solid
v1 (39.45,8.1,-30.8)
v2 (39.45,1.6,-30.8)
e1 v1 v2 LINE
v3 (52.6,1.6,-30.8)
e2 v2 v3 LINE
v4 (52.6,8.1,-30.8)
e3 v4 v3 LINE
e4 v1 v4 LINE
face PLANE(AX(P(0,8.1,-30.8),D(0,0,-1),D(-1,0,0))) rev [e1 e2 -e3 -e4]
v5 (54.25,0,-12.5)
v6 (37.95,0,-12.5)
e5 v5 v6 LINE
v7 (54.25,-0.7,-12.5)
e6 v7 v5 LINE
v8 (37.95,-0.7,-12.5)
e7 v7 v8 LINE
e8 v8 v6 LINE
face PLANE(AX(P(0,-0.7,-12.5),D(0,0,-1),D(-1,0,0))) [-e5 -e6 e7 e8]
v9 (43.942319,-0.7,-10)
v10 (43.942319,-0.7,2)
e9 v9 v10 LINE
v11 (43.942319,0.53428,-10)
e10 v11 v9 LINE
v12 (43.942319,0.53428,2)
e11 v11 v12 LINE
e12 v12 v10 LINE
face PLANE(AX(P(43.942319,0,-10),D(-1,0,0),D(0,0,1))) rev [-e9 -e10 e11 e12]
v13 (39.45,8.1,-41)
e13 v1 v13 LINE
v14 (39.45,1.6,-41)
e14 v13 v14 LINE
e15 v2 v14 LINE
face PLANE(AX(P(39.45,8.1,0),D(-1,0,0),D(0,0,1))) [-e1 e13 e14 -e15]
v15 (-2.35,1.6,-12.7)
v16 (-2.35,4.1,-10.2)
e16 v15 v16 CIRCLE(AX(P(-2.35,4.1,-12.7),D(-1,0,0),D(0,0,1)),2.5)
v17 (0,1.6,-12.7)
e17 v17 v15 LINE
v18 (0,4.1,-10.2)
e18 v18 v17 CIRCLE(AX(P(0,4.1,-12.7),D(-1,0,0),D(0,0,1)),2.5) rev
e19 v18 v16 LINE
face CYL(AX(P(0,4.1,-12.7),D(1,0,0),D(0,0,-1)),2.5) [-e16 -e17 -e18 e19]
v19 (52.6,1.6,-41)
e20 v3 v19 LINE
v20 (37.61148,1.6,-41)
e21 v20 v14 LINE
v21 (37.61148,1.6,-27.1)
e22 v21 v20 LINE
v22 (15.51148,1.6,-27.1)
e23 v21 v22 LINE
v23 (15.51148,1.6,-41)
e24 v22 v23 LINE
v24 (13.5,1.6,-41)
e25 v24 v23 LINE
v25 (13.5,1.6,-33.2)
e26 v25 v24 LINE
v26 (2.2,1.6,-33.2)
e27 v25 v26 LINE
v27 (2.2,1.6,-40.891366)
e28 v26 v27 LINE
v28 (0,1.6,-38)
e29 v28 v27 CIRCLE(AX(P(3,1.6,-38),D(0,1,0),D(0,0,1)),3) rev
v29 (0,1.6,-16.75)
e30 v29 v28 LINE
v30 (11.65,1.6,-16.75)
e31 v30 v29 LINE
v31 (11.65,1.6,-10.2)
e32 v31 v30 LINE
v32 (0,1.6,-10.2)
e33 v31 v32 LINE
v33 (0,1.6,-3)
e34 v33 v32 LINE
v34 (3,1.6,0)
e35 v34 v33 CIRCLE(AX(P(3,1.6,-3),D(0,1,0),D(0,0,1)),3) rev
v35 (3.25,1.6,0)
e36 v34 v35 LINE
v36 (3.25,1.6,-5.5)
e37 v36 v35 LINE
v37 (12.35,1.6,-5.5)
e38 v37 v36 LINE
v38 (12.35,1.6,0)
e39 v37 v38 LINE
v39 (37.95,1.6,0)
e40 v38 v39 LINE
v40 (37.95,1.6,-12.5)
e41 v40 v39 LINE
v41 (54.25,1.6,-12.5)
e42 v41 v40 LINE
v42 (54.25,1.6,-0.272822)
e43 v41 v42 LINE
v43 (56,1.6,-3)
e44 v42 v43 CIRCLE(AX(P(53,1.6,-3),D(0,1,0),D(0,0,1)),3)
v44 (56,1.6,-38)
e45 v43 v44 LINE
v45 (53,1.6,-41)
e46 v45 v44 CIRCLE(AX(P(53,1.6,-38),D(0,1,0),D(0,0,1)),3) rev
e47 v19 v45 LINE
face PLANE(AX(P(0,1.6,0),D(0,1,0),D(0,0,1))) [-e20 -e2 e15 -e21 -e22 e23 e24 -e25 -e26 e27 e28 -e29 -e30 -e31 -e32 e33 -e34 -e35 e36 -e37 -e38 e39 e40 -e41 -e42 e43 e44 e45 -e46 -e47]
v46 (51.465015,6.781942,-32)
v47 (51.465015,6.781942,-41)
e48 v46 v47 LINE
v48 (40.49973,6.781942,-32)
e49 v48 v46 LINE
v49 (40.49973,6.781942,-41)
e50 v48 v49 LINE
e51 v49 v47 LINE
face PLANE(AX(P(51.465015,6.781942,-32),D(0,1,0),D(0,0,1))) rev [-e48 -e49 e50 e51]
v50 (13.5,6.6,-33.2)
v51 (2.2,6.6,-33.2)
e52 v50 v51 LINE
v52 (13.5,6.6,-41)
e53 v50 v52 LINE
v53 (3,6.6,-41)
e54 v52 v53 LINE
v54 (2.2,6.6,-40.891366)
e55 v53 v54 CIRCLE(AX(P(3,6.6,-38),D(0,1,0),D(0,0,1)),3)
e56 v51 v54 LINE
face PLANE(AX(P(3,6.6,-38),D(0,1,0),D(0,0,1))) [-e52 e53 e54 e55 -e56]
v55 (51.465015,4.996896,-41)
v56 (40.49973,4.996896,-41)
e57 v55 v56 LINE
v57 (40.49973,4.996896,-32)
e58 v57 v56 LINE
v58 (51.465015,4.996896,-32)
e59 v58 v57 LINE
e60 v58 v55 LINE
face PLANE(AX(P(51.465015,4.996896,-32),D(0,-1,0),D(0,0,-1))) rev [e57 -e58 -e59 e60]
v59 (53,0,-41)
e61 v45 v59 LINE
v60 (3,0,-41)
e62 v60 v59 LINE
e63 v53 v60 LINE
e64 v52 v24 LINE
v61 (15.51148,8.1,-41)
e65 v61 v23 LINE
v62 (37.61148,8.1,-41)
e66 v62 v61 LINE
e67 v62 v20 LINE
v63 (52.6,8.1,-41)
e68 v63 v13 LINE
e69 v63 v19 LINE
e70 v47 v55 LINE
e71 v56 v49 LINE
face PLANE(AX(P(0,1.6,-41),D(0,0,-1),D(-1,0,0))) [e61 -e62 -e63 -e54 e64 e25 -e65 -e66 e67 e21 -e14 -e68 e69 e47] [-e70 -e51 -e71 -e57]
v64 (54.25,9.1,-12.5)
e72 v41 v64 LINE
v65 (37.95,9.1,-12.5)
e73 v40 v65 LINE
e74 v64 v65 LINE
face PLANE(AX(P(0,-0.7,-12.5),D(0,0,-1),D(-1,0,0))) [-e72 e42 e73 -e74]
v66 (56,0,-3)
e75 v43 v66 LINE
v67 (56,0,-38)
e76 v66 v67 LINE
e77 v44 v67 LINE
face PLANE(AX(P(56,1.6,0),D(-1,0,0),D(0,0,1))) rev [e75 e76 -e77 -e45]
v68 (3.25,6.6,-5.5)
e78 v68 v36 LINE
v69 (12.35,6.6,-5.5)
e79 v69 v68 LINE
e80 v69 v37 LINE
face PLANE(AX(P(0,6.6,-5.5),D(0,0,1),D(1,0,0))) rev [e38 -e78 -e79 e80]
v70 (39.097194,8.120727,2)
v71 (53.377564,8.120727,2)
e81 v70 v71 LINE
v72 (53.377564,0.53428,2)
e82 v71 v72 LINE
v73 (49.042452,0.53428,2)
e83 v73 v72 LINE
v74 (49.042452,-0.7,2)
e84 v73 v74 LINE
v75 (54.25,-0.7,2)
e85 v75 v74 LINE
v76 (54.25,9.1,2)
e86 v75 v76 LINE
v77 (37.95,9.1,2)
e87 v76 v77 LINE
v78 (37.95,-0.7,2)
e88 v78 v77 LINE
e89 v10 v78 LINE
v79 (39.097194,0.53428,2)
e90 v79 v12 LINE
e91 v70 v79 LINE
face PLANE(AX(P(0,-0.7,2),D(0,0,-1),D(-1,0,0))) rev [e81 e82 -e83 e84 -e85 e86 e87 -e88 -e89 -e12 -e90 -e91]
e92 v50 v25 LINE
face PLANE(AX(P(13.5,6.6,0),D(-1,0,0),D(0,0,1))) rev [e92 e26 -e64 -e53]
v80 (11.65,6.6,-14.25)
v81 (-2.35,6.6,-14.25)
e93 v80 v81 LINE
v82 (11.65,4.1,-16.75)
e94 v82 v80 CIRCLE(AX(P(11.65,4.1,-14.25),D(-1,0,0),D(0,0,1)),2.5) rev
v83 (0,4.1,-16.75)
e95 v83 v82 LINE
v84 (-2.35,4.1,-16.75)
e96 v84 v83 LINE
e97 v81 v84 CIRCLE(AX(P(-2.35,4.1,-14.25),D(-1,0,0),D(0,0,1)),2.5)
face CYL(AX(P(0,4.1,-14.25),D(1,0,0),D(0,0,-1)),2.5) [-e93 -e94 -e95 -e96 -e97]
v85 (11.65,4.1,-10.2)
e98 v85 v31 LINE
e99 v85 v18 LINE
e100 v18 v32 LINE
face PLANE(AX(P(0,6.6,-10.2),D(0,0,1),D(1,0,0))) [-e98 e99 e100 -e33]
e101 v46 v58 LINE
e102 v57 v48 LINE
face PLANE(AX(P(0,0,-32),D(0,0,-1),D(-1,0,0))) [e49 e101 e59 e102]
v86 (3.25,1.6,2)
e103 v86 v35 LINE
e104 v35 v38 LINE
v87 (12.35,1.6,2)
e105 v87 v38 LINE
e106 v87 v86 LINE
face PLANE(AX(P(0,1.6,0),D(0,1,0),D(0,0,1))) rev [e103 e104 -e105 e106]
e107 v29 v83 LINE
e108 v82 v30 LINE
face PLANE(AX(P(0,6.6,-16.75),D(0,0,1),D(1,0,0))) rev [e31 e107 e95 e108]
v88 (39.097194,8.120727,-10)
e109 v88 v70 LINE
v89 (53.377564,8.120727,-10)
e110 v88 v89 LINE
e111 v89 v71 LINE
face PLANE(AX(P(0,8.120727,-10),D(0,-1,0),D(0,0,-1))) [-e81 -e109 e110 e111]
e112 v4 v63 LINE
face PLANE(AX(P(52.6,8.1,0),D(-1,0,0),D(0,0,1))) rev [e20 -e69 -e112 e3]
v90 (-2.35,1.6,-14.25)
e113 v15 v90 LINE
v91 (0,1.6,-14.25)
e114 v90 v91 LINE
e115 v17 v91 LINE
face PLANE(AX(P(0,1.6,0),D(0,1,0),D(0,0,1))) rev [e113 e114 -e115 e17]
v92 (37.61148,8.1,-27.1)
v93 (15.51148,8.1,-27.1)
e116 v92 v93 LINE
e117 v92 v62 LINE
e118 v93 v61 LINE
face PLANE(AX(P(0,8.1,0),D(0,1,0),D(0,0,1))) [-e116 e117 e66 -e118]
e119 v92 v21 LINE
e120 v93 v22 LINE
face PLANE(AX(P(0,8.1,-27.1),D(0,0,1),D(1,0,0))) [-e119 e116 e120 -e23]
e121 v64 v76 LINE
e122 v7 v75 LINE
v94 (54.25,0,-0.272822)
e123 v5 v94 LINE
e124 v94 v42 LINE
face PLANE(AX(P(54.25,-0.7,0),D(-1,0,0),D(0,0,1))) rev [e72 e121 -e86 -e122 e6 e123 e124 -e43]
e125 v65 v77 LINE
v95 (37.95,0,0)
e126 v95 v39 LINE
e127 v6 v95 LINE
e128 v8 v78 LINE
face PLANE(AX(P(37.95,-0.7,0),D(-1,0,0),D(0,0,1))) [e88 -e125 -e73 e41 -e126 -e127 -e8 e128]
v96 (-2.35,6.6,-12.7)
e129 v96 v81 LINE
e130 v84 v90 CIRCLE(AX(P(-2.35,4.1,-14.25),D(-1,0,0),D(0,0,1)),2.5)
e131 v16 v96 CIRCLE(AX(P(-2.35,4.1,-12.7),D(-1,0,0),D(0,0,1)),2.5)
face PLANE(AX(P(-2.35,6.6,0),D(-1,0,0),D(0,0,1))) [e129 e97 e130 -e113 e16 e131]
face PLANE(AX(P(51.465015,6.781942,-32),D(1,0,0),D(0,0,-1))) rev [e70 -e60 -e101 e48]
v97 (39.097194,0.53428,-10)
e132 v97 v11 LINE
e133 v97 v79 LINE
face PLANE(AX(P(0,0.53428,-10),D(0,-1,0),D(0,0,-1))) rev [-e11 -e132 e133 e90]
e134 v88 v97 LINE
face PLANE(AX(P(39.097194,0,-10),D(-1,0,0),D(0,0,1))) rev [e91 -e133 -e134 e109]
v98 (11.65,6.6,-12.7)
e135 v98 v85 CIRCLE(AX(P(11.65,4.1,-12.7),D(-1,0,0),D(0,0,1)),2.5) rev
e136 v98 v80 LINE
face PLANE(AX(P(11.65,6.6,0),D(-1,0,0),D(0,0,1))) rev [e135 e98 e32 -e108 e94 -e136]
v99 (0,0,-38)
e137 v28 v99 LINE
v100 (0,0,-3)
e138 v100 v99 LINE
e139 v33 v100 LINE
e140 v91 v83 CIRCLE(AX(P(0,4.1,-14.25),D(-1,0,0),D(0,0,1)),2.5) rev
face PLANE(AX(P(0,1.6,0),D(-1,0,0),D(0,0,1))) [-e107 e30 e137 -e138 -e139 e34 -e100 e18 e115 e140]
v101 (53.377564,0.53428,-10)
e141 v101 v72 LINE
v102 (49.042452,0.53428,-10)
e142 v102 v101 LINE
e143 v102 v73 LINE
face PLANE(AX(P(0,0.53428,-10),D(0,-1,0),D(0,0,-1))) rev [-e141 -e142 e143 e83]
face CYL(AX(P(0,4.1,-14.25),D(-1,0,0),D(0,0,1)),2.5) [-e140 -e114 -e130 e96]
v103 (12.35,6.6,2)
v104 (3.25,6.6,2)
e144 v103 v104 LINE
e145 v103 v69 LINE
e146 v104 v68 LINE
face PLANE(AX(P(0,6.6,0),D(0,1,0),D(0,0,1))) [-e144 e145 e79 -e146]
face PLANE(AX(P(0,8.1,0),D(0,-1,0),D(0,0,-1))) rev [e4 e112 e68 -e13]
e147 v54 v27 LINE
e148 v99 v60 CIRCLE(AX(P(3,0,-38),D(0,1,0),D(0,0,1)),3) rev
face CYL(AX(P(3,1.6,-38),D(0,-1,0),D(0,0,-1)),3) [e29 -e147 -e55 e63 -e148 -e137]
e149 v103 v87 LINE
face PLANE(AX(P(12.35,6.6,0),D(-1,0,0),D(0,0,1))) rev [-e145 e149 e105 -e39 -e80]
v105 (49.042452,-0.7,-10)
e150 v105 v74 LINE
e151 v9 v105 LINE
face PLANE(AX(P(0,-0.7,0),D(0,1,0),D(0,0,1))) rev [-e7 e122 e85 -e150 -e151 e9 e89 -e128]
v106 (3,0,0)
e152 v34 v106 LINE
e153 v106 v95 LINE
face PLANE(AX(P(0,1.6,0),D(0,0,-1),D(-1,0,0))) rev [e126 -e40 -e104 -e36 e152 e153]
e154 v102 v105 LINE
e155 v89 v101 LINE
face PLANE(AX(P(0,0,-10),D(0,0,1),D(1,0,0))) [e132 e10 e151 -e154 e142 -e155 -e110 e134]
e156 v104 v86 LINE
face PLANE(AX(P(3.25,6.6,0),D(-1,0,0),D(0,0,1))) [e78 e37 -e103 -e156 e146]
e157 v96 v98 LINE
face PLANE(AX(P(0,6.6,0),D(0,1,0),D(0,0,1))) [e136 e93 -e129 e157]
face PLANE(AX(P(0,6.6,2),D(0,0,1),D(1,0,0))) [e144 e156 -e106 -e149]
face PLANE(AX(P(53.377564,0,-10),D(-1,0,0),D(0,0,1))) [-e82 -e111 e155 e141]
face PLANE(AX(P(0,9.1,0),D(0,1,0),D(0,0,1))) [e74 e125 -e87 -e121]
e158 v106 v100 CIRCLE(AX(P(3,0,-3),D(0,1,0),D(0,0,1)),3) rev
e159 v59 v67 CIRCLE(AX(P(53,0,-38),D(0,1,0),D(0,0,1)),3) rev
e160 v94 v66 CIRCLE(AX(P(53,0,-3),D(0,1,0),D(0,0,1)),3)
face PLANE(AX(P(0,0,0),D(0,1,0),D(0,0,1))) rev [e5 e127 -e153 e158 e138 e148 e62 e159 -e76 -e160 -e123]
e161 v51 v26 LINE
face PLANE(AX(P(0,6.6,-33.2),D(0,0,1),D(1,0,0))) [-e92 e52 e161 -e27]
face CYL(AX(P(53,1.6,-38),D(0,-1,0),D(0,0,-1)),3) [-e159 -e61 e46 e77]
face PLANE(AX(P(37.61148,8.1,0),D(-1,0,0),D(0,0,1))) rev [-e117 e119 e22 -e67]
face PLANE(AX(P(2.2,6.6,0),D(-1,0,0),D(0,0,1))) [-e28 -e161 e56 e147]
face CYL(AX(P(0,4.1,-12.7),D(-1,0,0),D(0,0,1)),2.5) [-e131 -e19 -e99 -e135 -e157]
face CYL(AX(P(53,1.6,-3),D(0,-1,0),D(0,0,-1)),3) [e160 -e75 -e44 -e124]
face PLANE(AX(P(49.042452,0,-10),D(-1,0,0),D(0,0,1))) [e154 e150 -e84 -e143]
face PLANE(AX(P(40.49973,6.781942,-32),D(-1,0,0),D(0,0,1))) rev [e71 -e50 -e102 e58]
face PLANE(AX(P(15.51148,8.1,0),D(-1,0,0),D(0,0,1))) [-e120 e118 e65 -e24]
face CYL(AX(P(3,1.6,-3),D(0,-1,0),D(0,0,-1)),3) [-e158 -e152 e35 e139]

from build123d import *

# Parameters (mm, degrees)
BOSS_EXTRUDE1_DEPTH      = 1.6
BOSS_EXTRUDE2_DEPTH      = 9.1
BOSS_EXTRUDE2_DEPTH_BACK = 0.7
BOSS_EXTRUDE3_START      = 1.6
SKETCH1_4_W              = 22.1
SKETCH1_4_H              = 13.9
SKETCH1_4_W_2            = 13.15
SKETCH1_4_H_2            = 10.2
BOSS_EXTRUDE3_DEPTH      = 6.5
BOSS_EXTRUDE4_START      = 1.6
SKETCH1_5_W              = 9.1
SKETCH1_5_H              = 7.5
SKETCH1_5_W_2            = 14
SKETCH1_5_H_2            = 6.55
BOSS_EXTRUDE4_DEPTH      = 5
SKETCH2_W                = 10.965284592
SKETCH2_H                = 1.785046329
CUT_EXTRUDE1_DEPTH       = 9
SKETCH3_W                = 5.100132369
SKETCH3_H                = 1.23427986
SKETCH3_W_2              = 14.280370632
SKETCH3_H_2              = 7.586446898
CUT_EXTRUDE2_DEPTH       = 12
FILLET1_R                = 2.5


with BuildPart() as part:
    # Sketch1 → Boss-Extrude1 (new body)
    with BuildSketch(Plane(origin=(0, 0, 0), x_dir=(1, 0, 0), z_dir=(0, 1, 0))):
        with BuildLine():
            ThreePointArc((0, 3), (0.878679656, 0.878679656), (3, 0))
            Line((3, 0), (53, 0))
            ThreePointArc((53, 0), (55.121320344, 0.878679656), (56, 3))
            Line((56, 3), (56, 38))
            ThreePointArc((56, 38), (55.121320344, 40.121320344), (53, 41))
            Line((53, 41), (3, 41))
            ThreePointArc((3, 41), (0.878679656, 40.121320344), (0, 38))
            Line((0, 38), (0, 3))
        make_face()
    extrude(amount=BOSS_EXTRUDE1_DEPTH)

    # Sketch1<3> → Boss-Extrude2 (add, two sides: drawn at the far end of the back side and taken through both)
    with BuildSketch(Plane(origin=(0, 0, 0), x_dir=(1, 0, 0), z_dir=(0, 1, 0)).offset(-BOSS_EXTRUDE2_DEPTH_BACK)):
        with BuildLine():
            Line((37.95, 12.5), (37.95, 0))
            Line((37.95, 0), (53, 0))
            ThreePointArc((53, 0), (53.639713183, 0.068998969), (54.25, 0.272821971))
            Line((54.25, 0.272821971), (54.25, 12.5))
            Line((54.25, 12.5), (37.95, 12.5))
        make_face()
        with BuildLine():
            Line((53, 0), (37.95, 0))
            Line((37.95, 0), (37.95, -2))
            Line((37.95, -2), (54.25, -2))
            Line((54.25, -2), (54.25, 0.272821971))
            ThreePointArc((54.25, 0.272821971), (53.639713183, 0.068998969), (53, 0))
        make_face()
    extrude(amount=BOSS_EXTRUDE2_DEPTH + BOSS_EXTRUDE2_DEPTH_BACK)

    # Sketch1<4> → Boss-Extrude3 (add)
    with BuildSketch(Plane(origin=(0, 0, 0), x_dir=(1, 0, 0), z_dir=(0, 1, 0)).offset(BOSS_EXTRUDE3_START)):
        with Locations((26.561479759, 34.05)):
            Rectangle(SKETCH1_4_W, SKETCH1_4_H)
        with Locations((46.025, 35.9)):
            Rectangle(SKETCH1_4_W_2, SKETCH1_4_H_2)
    extrude(amount=BOSS_EXTRUDE3_DEPTH)

    # Sketch1<5> → Boss-Extrude4 (add)
    with BuildSketch(Plane(origin=(0, 0, 0), x_dir=(1, 0, 0), z_dir=(0, 1, 0)).offset(BOSS_EXTRUDE4_START)):
        with Locations((7.8, 1.75)):
            Rectangle(SKETCH1_5_W, SKETCH1_5_H)
        with Locations((4.65, 13.475)):
            Rectangle(SKETCH1_5_W_2, SKETCH1_5_H_2)
        with BuildLine():
            ThreePointArc((3, 41), (2.596328956, 40.972717559), (2.2, 40.891366459))
            Line((2.2, 40.891366459), (2.2, 33.2))
            Line((2.2, 33.2), (13.5, 33.2))
            Line((13.5, 33.2), (13.5, 41))
            Line((13.5, 41), (3, 41))
        make_face()
    extrude(amount=BOSS_EXTRUDE4_DEPTH)

    # Sketch2 → Cut-Extrude1 (cut)
    with BuildSketch(Plane(origin=(0, 0, -41), x_dir=(-1, 0, 0), z_dir=(0, 0, -1))):
        with Locations((-45.98237221, 5.889418847)):
            Rectangle(SKETCH2_W, SKETCH2_H)
    extrude(amount=-CUT_EXTRUDE1_DEPTH, mode=Mode.SUBTRACT)

    # Sketch3 → Cut-Extrude2 (cut)
    with BuildSketch(Plane.XY.offset(2)):
        with Locations((46.492385447, -0.08286007)):
            Rectangle(SKETCH3_W, SKETCH3_H)
        with Locations((46.237378828, 4.327503309)):
            Rectangle(SKETCH3_W_2, SKETCH3_H_2)
    extrude(amount=-CUT_EXTRUDE2_DEPTH, mode=Mode.SUBTRACT)

    # Fillet1
    fillet1_edges = [part.edges().sort_by_distance(p)[0] for p in [
        (-1.175, 1.6, -16.75),
        (-1.175, 1.6, -10.2),
        (4.65, 6.6, -16.75),
        (4.65, 6.6, -10.2),
    ]]
    fillet(fillet1_edges, radius=FILLET1_R - 0.0001)  # a hair under: the kernel refuses the full size


solid = part.part
